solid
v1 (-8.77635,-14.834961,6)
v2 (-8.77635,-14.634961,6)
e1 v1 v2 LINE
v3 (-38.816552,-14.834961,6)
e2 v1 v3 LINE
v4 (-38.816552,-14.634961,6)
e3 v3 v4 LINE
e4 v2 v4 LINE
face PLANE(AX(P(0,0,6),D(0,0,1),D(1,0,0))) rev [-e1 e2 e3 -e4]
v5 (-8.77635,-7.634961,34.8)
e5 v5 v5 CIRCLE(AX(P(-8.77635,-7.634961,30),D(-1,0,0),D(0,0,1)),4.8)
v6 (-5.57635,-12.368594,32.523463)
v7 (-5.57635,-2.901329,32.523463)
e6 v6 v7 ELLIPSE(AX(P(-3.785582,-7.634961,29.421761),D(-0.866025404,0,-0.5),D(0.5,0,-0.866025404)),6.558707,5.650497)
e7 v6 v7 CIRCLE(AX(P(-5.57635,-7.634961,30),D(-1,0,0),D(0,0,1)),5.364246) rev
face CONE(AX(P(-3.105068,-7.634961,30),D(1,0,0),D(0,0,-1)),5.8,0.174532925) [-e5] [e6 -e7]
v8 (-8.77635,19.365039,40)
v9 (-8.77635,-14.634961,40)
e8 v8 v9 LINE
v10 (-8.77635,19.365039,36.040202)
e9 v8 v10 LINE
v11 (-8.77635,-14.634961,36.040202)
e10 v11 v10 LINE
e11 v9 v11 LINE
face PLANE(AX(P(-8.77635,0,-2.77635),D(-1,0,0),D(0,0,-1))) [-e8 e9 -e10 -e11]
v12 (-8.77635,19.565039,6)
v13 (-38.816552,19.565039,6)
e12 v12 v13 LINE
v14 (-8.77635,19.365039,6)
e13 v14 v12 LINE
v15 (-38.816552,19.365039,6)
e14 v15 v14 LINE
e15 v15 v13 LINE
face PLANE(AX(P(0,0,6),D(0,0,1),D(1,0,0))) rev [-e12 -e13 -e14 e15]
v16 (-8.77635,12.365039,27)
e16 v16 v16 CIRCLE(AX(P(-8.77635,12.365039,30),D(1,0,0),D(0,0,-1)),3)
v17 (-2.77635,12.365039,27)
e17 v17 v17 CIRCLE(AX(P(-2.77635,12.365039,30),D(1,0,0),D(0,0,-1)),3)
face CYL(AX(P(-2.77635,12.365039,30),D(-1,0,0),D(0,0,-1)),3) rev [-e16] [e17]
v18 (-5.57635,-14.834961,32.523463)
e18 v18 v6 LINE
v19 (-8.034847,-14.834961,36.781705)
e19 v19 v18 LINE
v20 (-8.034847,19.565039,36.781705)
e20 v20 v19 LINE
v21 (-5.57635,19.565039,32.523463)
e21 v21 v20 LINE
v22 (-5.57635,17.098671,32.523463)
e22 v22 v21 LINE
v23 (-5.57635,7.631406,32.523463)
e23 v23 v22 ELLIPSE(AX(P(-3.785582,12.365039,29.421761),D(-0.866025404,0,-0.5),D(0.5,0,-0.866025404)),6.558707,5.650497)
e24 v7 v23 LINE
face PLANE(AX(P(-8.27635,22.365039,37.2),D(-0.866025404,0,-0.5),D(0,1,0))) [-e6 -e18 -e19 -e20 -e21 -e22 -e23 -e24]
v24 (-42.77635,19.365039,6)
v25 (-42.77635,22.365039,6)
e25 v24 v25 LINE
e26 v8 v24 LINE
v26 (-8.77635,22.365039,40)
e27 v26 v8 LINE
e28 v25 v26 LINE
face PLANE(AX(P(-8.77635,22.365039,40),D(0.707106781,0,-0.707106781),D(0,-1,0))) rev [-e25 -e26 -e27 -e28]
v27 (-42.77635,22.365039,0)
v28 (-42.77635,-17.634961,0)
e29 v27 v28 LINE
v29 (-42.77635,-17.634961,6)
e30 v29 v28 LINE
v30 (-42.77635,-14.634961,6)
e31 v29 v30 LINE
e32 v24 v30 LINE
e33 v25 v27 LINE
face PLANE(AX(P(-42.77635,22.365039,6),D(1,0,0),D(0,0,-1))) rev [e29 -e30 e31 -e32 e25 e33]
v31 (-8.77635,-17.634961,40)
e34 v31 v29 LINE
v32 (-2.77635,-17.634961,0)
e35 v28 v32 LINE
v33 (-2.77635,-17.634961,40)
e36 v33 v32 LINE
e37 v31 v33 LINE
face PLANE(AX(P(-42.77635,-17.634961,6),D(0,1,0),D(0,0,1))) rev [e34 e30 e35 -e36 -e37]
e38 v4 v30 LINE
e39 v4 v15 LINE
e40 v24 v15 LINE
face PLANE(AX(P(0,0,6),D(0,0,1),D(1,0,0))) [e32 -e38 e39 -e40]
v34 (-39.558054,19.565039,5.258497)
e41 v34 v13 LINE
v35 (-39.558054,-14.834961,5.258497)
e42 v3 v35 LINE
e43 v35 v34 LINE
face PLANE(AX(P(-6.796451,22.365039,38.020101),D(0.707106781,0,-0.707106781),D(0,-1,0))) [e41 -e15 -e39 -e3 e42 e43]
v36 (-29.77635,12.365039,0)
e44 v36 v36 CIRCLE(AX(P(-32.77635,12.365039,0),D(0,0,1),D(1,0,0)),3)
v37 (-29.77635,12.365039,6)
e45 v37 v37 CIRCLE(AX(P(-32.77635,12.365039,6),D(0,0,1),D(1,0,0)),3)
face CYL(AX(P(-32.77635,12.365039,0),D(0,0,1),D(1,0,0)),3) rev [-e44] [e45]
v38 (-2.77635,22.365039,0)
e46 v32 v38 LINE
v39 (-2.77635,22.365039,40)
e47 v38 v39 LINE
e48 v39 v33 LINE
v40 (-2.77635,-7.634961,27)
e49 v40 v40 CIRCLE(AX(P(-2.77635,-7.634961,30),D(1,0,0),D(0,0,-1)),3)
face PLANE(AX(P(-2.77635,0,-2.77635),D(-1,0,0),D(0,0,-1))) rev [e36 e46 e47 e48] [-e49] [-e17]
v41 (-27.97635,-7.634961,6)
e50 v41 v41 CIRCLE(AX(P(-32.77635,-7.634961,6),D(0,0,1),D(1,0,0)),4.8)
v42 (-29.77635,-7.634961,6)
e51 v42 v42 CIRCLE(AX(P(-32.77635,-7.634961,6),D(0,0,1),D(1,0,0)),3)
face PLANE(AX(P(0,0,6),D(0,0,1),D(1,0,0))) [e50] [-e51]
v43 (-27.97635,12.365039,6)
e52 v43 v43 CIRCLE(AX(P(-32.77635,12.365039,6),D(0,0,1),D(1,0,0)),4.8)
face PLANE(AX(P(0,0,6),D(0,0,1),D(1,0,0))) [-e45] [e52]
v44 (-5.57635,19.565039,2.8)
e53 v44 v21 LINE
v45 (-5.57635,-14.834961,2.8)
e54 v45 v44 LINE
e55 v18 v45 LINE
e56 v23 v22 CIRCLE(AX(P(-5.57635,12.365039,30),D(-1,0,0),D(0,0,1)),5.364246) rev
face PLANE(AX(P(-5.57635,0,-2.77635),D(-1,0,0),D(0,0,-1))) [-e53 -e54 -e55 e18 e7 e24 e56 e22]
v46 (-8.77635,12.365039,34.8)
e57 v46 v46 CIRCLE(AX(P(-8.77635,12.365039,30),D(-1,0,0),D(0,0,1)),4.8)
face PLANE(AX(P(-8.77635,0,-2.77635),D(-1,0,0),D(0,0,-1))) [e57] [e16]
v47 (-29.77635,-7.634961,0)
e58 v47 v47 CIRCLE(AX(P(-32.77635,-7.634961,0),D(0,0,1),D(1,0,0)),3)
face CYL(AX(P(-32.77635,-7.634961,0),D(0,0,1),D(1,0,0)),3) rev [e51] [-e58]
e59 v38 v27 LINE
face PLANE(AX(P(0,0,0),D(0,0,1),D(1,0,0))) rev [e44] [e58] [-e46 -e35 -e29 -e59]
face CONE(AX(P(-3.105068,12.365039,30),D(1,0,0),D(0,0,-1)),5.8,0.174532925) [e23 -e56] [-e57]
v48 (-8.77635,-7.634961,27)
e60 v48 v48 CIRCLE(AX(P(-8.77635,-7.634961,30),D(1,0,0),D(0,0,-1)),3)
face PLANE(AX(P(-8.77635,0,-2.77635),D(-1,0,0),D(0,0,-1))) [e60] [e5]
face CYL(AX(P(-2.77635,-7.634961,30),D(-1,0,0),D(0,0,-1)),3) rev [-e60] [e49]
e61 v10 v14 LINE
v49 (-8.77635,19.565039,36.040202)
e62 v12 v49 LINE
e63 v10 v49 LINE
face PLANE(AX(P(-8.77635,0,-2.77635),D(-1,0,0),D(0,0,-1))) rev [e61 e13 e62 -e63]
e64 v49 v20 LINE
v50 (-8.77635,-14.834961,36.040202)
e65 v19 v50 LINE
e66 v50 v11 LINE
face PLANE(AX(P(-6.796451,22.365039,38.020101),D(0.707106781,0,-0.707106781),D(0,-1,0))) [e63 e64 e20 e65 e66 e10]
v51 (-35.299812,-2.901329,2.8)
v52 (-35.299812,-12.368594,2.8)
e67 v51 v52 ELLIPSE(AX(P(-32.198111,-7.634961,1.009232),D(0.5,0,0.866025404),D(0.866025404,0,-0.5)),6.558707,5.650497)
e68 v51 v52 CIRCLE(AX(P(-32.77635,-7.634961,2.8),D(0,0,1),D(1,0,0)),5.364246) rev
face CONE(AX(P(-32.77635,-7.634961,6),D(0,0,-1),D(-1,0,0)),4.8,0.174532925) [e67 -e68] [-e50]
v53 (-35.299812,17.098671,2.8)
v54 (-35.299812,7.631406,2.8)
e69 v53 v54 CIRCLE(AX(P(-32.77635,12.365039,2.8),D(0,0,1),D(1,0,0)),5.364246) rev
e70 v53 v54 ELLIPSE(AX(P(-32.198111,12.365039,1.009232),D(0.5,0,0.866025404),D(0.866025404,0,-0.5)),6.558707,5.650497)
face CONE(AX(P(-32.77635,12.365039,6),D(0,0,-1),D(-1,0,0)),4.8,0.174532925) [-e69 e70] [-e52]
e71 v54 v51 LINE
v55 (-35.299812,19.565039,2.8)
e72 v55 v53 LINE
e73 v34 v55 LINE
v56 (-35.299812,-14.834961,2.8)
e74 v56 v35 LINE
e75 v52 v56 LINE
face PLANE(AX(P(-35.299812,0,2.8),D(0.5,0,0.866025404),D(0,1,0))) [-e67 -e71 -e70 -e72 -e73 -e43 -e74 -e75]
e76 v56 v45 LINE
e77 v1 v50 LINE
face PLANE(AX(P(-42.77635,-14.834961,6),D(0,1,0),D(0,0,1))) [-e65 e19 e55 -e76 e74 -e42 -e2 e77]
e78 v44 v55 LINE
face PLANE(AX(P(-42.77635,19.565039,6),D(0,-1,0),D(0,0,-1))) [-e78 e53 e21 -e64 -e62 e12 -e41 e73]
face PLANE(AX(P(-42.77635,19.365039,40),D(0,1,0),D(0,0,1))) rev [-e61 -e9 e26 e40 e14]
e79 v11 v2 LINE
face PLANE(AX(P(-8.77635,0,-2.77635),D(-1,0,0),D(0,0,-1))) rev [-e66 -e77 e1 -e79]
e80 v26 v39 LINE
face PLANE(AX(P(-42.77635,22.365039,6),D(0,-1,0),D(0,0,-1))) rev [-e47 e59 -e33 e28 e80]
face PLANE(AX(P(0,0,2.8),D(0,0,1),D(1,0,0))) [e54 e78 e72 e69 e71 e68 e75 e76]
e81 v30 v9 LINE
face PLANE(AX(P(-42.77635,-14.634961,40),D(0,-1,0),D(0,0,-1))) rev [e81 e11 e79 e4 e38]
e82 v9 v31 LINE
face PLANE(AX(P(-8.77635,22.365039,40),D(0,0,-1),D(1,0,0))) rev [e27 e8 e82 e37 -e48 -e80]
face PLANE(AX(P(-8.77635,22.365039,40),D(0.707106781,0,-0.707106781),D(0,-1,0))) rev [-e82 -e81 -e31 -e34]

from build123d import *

# Parameters (mm, degrees)
SKETCH_1_W                         = 40
SKETCH_1_H                         = 40
EXTRUDE_1_DEPTH                    = 6
SKETCH_2_R                         = 3
CUT_EXTRUDE_1_DEPTH                = 6
PATTERN_LINEAR_1_COUNT             = 2
PATTERN_LINEAR_1_PITCH             = 20
CHAMFER_1_SIZE                     = 6
SKETCH_3_W                         = 34
SKETCH_3_H                         = 3
EXTRUDE_2_DEPTH                    = 34
CHAMFER_2_SIZE                     = 34
PATTERN_LINEAR_2_COUNT             = 2
PATTERN_LINEAR_2_PITCH             = 37
CHAMFER_2_OF_PATTERN_LINEAR_2_SIZE = 34
SHELL_START                        = 2.8
SHELL_3_OUTLINE_W                  = 3.2
SHELL_3_OUTLINE_H                  = 34.4
SHELL_3_DEPTH                      = 34.4
SHELL_3_2_OUTLINE_W                = 31.2
SHELL_3_2_OUTLINE_H                = 34.4
SHELL_3_2_OUTLINE_R                = 5.8
SHELL_3_2_DEPTH                    = 3.2
SHELL_START_2                      = -8.776349614
SHELL_3_3_OUTLINE_R                = 5.8
SHELL_3_3_OUTLINE_R_2              = 3
SHELL_3_3_DEPTH                    = 3.2
SHELL_START_3                      = -16
SHELL_3_4_DEPTH                    = 37
CHAMFER_5_SIZE                     = 5.67128182
CHAMFER_5_SIZE_2                   = 1
CHAMFER_6_SIZE                     = 5.67128182
CHAMFER_6_SIZE_2                   = 1
CHAMFER_7_SIZE                     = 2.7
CHAMFER_7_SIZE_2                   = 4.67653718


with BuildPart() as part:
    # Эскиз1 → Бобышка-Вытянуть1 (new body)
    with BuildSketch(Plane.XY):
        with Locations((-22.776349614, 2.36503856)):
            Rectangle(SKETCH_1_W, SKETCH_1_H)
    extrude(amount=EXTRUDE_1_DEPTH)

    # Эскиз2 → Вырез-Вытянуть1 (cut)
    with BuildSketch(Plane.XY.offset(6)):
        with Locations((-32.776349614, 12.36503856)):
            Circle(SKETCH_2_R)
    cut_extrude_1 = extrude(amount=-CUT_EXTRUDE_1_DEPTH, mode=Mode.SUBTRACT)

    # Линейный массив1: Вырез-Вытянуть1 ×2
    with Locations(*[(0, -i * PATTERN_LINEAR_1_PITCH, 0) for i in range(1, PATTERN_LINEAR_1_COUNT)]):
        add(cut_extrude_1, mode=Mode.SUBTRACT)

    # Фаска1
    chamfer_1_edges = [part.edges().sort_by_distance(p)[0] for p in [
        (-2.776349614, 2.36503856, 6),
    ]]
    chamfer(chamfer_1_edges, length=CHAMFER_1_SIZE - 0.0001)  # a hair under: the kernel refuses the full size

    # Зеркальное отражение1: part across plane


with BuildPart() as part_1:
    add(part.part)
    add(part.part.mirror(Plane(origin=(-8.776349614, 0, 6), x_dir=(-0.7071067811865465, 0, 0.7071067811865486), z_dir=(0.7071067811865488, 0, 0.7071067811865464))))

    # Эскиз3 → Бобышка-Вытянуть2 (add)
    with BuildSketch(Plane.XY.offset(6)):
        with Locations((-25.776349614, 20.86503856)):
            Rectangle(SKETCH_3_W, SKETCH_3_H)
    extrude_2 = extrude(amount=EXTRUDE_2_DEPTH)

    # Фаска2
    chamfer_2_edges = [part_1.edges().sort_by_distance(p)[0] for p in [
        (-42.776349614, 20.86503856, 40),
    ]]
    chamfer(chamfer_2_edges, length=CHAMFER_2_SIZE)

    # Линейный массив2: Бобышка-Вытянуть2 ×2
    with Locations(*[(0, -i * PATTERN_LINEAR_2_PITCH, 0) for i in range(1, PATTERN_LINEAR_2_COUNT)]):
        add(extrude_2)

    # Фаска2 of Линейный массив2
    chamfer_2_of_pattern_linear_2_edges = [part_1.edges().sort_by_distance(p)[0] for p in [
        (-42.776349614, -16.13496144, 40),
    ]]
    chamfer(chamfer_2_of_pattern_linear_2_edges, length=CHAMFER_2_OF_PATTERN_LINEAR_2_SIZE)

    # Оболочка3: read off the stored shape, not the designer's step
    # Оболочка3 outline → Оболочка3 (cut)
    with BuildSketch(Plane.XY.offset(SHELL_START)):
        with Locations((-7.176349614, 2.36503856)):
            Rectangle(SHELL_3_OUTLINE_W, SHELL_3_OUTLINE_H)
    extrude(amount=SHELL_3_DEPTH, mode=Mode.SUBTRACT)

    # Shell 3 2 outline → Shell 3 2 (cut)
    with BuildSketch(Plane.XY.offset(SHELL_START)):
        with Locations((-24.376349614, 2.36503856)):
            Rectangle(SHELL_3_2_OUTLINE_W, SHELL_3_2_OUTLINE_H)
        with Locations((-32.776349614, -7.63496144)):
            Circle(SHELL_3_2_OUTLINE_R, mode=Mode.SUBTRACT)
        with Locations((-32.776349614, 12.36503856)):
            Circle(SHELL_3_2_OUTLINE_R, mode=Mode.SUBTRACT)
    extrude(amount=SHELL_3_2_DEPTH, mode=Mode.SUBTRACT)

    # Shell 3 3 outline → Shell 3 3 (add)
    # profile 1 of 2: a face of its own
    with BuildSketch(Plane.YZ.offset(SHELL_START_2)):
        with Locations((12.36503856, 30)):
            Circle(SHELL_3_3_OUTLINE_R)
        with Locations((12.36503856, 30)):
            Circle(SHELL_3_3_OUTLINE_R_2, mode=Mode.SUBTRACT)
    # profile 2 of 2: a face of its own
    with BuildSketch(Plane.YZ.offset(SHELL_START_2)):
        with Locations((-7.63496144, 30)):
            Circle(SHELL_3_3_OUTLINE_R)
        with Locations((-7.63496144, 30)):
            Circle(SHELL_3_3_OUTLINE_R_2, mode=Mode.SUBTRACT)
    extrude(amount=SHELL_3_3_DEPTH)

    # Shell 3 4 outline → Shell 3 4 (add)
    with BuildSketch(Plane(origin=(0, 0, 0), x_dir=(1, 0, 0), z_dir=(0, 1, 0)).offset(SHELL_START_3)):
        Polygon((-39.976349614, -4.840202025), (-39.976349614, -6), (-38.81655164, -6), align=None)
        Polygon((-7.61655164, -37.2), (-8.776349614, -36.040202025), (-8.776349614, -37.2), align=None)
    extrude(amount=SHELL_3_4_DEPTH)

    # Фаска5
    # the kernel refuses this chamfer: 5.67128182, 1 mm, written as the material it takes off along each edge
    with BuildSketch(Plane(origin=(-8.776349614, 12.36503856, 30), x_dir=(0, 1, 0), z_dir=(0, 0, -1))) as chamfer_5_piece_1_section:
        Polygon((5.8, CHAMFER_5_SIZE), (5.8 - CHAMFER_5_SIZE_2, 0), (5.8, 0), align=None)
    chamfer_5_piece_1 = revolve(axis=Axis((-8.776349614, 12.36503856, 30), (1, 0, 0)), mode=Mode.PRIVATE)
    chamfer_5_piece_1 = split(chamfer_5_piece_1, bisect_by=Plane(origin=(-5.576349614, 12.36503856, 30), z_dir=(-1, 0, 0)), keep=Keep.TOP, mode=Mode.PRIVATE)
    add(chamfer_5_piece_1, mode=Mode.SUBTRACT)
    with BuildSketch(Plane(origin=(-8.776349614, -7.63496144, 30), x_dir=(0, 1, 0), z_dir=(0, 0, -1))) as chamfer_5_piece_2_section:
        Polygon((5.8 - CHAMFER_5_SIZE_2, 0), (5.8, CHAMFER_5_SIZE), (5.8, 0), align=None)
    chamfer_5_piece_2 = revolve(axis=Axis((-8.776349614, -7.63496144, 30), (1, 0, 0)), mode=Mode.PRIVATE)
    chamfer_5_piece_2 = split(chamfer_5_piece_2, bisect_by=Plane(origin=(-5.576349614, -7.63496144, 30), z_dir=(-1, 0, 0)), keep=Keep.TOP, mode=Mode.PRIVATE)
    add(chamfer_5_piece_2, mode=Mode.SUBTRACT)

    # Фаска6
    # the kernel refuses this chamfer: 5.67128182, 1 mm, written as the material it takes off along each edge
    with BuildSketch(Plane(origin=(-32.776349614, -7.63496144, 6), x_dir=(1, 0, 0), z_dir=(0, -1, 0))) as chamfer_6_piece_1_section:
        Polygon((5.8, -CHAMFER_6_SIZE), (5.8 - CHAMFER_6_SIZE_2, 0), (5.8, 0), align=None)
    chamfer_6_piece_1 = revolve(axis=Axis((-32.776349614, -7.63496144, 6), (0, 0, 1)), mode=Mode.PRIVATE)
    chamfer_6_piece_1 = split(chamfer_6_piece_1, bisect_by=Plane(origin=(-32.776349614, -7.63496144, 2.8), z_dir=(0, 0, 1)), keep=Keep.TOP, mode=Mode.PRIVATE)
    add(chamfer_6_piece_1, mode=Mode.SUBTRACT)
    with BuildSketch(Plane(origin=(-32.776349614, 12.36503856, 6), x_dir=(1, 0, 0), z_dir=(0, -1, 0))) as chamfer_6_piece_2_section:
        Polygon((5.8, -CHAMFER_6_SIZE), (5.8 - CHAMFER_6_SIZE_2, 0), (5.8, 0), align=None)
    chamfer_6_piece_2 = revolve(axis=Axis((-32.776349614, 12.36503856, 6), (0, 0, 1)), mode=Mode.PRIVATE)
    chamfer_6_piece_2 = split(chamfer_6_piece_2, bisect_by=Plane(origin=(-32.776349614, 12.36503856, 2.8), z_dir=(0, 0, 1)), keep=Keep.TOP, mode=Mode.PRIVATE)
    add(chamfer_6_piece_2, mode=Mode.SUBTRACT)

    # Фаска7
    # the kernel refuses this chamfer: 4.67653718, 2.7 mm, written as the material it adds along each edge
    with BuildSketch(Plane(origin=(-39.976349614, 19.56503856, 2.8), x_dir=(0, 0, 1), z_dir=(0, -1, 0))) as chamfer_7_piece_1_section:
        Polygon((CHAMFER_7_SIZE, 0), (0, -CHAMFER_7_SIZE_2), (0, 0), align=None)
    chamfer_7_piece_1 = extrude(amount=34.4, mode=Mode.PRIVATE)
    chamfer_7_piece_1 = chamfer_7_piece_1 - Plane(origin=(-32.776349614, -7.63496144, 2.8), x_dir=(1, 0, 0), z_dir=(0, 0, 1)) * Cylinder(3, 88, mode=Mode.PRIVATE)
    chamfer_7_piece_1 = chamfer_7_piece_1 - Plane(origin=(-32.776349614, 12.36503856, 2.8), x_dir=(1, 0, 0), z_dir=(0, 0, 1)) * Cylinder(3, 88, mode=Mode.PRIVATE)
    add(chamfer_7_piece_1)
    with BuildSketch(Plane(origin=(-5.576349614, -14.83496144, 37.2), x_dir=(-1, 0, 0), z_dir=(0, 1, 0))) as chamfer_7_piece_2_section:
        Polygon((CHAMFER_7_SIZE, 0), (0, -CHAMFER_7_SIZE_2), (0, 0), align=None)
    chamfer_7_piece_2 = extrude(amount=34.4, mode=Mode.PRIVATE)
    chamfer_7_piece_2 = chamfer_7_piece_2 - Plane(origin=(-5.576349614, -7.63496144, 30), x_dir=(0, 0, -1), z_dir=(-1, 0, 0)) * Cylinder(3, 88, mode=Mode.PRIVATE)
    chamfer_7_piece_2 = chamfer_7_piece_2 - Plane(origin=(-5.576349614, 12.36503856, 30), x_dir=(0, 0, -1), z_dir=(-1, 0, 0)) * Cylinder(3, 88, mode=Mode.PRIVATE)
    add(chamfer_7_piece_2)


solid = part_1.part
